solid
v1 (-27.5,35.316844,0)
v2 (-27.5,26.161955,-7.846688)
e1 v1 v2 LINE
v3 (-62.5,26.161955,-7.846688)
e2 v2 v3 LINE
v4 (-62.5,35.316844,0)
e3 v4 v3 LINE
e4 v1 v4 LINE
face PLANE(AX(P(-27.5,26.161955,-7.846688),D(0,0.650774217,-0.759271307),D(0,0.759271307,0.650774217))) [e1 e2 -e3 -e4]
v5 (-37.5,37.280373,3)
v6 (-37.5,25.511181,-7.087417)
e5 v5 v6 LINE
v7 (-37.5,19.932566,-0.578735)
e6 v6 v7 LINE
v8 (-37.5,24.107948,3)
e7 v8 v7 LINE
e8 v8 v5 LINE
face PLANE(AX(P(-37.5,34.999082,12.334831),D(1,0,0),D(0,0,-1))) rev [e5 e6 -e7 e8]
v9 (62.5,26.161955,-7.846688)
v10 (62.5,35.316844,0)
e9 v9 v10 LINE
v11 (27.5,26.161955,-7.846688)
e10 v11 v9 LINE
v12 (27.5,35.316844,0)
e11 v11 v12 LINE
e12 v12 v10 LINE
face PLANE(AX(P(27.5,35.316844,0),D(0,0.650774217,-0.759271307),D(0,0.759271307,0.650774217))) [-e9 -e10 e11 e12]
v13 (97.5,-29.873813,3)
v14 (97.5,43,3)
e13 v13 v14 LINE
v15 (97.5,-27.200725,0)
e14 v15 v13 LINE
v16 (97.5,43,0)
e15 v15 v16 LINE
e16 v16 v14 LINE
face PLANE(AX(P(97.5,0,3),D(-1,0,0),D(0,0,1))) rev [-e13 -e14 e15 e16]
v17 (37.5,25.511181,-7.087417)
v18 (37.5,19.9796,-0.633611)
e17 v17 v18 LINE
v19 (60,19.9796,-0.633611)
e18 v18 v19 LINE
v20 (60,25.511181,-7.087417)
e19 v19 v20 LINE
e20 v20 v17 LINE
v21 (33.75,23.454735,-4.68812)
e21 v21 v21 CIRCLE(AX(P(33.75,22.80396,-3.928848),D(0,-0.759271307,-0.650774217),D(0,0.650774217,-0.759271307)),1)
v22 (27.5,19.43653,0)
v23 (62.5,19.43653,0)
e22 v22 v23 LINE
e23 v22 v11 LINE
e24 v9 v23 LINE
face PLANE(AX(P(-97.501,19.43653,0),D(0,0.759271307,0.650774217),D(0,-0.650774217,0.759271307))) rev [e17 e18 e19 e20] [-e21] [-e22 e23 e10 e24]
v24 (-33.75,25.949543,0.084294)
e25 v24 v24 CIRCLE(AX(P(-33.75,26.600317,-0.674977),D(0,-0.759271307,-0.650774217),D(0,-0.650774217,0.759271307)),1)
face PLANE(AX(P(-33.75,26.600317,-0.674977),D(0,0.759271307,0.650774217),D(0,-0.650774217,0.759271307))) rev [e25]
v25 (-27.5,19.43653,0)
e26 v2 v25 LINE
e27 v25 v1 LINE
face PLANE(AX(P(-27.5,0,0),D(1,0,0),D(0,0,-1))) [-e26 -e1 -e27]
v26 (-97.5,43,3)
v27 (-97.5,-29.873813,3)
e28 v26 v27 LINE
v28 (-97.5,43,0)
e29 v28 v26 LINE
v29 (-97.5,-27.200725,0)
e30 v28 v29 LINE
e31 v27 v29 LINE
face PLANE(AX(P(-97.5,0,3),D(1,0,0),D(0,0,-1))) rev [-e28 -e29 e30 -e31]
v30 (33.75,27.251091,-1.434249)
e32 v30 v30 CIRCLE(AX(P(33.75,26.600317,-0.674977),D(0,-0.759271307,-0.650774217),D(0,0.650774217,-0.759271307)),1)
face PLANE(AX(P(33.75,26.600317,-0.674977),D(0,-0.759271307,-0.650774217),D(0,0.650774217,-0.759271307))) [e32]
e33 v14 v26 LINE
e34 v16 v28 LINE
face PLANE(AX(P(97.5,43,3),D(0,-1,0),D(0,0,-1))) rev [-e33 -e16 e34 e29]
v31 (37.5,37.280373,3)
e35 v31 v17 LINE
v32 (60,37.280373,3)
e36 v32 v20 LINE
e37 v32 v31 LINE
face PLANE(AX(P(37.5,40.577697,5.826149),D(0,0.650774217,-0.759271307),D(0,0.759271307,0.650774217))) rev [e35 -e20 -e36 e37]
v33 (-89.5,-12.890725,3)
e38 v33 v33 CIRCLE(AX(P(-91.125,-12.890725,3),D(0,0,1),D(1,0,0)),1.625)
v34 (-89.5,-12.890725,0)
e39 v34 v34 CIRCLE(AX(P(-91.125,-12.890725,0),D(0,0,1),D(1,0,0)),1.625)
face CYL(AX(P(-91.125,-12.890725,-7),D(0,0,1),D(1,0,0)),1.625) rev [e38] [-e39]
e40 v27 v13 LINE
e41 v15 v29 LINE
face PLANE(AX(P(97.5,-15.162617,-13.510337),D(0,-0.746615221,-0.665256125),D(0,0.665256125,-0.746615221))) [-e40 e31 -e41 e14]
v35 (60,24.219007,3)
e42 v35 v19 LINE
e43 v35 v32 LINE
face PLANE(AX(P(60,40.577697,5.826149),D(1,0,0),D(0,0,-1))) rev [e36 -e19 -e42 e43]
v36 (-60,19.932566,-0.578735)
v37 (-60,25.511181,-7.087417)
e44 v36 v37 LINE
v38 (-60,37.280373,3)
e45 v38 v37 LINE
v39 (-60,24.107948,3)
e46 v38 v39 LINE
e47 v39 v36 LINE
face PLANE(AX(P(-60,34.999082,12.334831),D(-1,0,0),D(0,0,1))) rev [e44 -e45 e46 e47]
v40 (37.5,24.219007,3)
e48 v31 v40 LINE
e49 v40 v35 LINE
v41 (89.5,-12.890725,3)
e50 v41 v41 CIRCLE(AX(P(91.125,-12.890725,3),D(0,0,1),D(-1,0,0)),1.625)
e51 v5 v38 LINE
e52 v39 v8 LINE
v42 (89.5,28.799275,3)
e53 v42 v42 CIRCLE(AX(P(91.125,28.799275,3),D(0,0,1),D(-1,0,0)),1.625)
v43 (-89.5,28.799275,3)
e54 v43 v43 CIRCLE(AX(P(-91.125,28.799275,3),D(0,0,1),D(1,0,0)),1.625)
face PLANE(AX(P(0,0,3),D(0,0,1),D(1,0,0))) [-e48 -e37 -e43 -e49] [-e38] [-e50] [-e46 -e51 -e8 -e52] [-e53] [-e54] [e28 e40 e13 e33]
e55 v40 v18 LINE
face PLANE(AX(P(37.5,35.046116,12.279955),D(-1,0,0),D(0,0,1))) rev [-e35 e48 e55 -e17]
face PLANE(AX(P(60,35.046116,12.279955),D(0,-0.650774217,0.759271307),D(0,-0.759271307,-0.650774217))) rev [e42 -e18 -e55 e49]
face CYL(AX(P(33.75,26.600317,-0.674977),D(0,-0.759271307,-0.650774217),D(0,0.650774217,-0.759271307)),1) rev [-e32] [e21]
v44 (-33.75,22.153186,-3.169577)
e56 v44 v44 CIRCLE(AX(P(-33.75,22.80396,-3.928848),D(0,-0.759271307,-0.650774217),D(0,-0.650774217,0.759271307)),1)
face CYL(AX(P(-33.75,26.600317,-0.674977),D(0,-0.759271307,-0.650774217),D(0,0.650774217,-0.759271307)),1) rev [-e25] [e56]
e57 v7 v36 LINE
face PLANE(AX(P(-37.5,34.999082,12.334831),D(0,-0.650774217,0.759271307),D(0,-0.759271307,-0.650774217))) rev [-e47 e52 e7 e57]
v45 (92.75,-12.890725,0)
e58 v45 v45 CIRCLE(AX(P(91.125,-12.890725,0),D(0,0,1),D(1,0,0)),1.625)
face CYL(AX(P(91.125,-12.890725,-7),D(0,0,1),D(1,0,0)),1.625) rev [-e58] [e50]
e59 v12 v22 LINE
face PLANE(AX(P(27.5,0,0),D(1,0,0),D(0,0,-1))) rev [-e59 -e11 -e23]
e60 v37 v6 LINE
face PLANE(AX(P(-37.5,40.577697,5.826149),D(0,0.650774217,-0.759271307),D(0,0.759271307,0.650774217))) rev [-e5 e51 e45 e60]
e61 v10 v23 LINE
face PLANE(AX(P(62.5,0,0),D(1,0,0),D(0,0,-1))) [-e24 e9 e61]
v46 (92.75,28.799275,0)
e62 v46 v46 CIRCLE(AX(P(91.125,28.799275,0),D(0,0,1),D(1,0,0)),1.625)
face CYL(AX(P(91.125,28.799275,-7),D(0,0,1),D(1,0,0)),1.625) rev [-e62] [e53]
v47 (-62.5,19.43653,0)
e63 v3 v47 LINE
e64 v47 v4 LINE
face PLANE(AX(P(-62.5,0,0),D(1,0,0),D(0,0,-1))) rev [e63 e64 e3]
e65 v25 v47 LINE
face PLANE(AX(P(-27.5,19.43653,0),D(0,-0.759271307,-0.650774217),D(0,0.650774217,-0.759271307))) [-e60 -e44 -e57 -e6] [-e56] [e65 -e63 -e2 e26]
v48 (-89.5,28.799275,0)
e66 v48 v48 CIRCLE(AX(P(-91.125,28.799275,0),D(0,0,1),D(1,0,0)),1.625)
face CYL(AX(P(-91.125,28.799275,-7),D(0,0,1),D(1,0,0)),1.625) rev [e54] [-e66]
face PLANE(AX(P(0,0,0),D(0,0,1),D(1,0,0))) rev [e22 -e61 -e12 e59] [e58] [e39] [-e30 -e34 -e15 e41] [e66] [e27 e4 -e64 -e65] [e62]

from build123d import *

# Parameters (mm, degrees)
CROQUIS1_W                  = 195
CROQUIS1_H                  = 38
CROQUIS1_R                  = 1.625
SALIENTE_EXTRUIR1_DEPTH     = 3
CROQUIS8_W                  = 195
CROQUIS8_H                  = 3
SALIENTE_EXTRUIR5_DEPTH     = 5
CROQUIS9_W                  = 195
CROQUIS9_H                  = 3
SALIENTE_EXTRUIR6_DEPTH     = 5
SALIENTE_EXTRUIR7_START     = -35
SALIENTE_EXTRUIR7_DEPTH     = 35
CORTAR_EXTRUIR4_DEPTH       = 106.249773968
CORTAR_EXTRUIR4_DEPTH_BACK  = 106.249773968
CROQUIS11_W                 = 22.5
CROQUIS11_H                 = 8.5
CORTAR_EXTRUIR5_REACH       = 168.049
CROQUIS13_R                 = 1
CORTAR_EXTRUIR6_DEPTH       = 5
SALIENTE_EXTRUIR8_START     = -35
SALIENTE_EXTRUIR8_DEPTH     = 35
CORTAR_EXTRUIR7_DEPTH       = 105.027363957
CORTAR_EXTRUIR7_DEPTH_BACK  = 105.027363957
CROQUIS16_W                 = 22.5
CROQUIS16_H                 = 8.572274099
CROQUIS17_R                 = 1
CORTAR_EXTRUIR8_DEPTH       = 5
CROQUIS18_R                 = 1.625
CORTAR_EXTRUIR9_DEPTH       = 10
CROQUIS19_W                 = 195
CROQUIS19_H                 = 24
SALIENTE_EXTRUIR9_DEPTH     = 3
CROQUIS20_W                 = 195
CROQUIS20_H                 = 28.69
SALIENTE_EXTRUIR10_DEPTH    = 3
CROQUIS22_W                 = 195
CROQUIS22_H                 = 8.799275258
CROQUIS22_W_2               = 10.817472397
CROQUIS22_H_2               = 9.408992843
CROQUIS22_W_3               = 11.057059306
SALIENTE_EXTRUIR11_DEPTH    = 3
CROQUIS23_R                 = 1.625
CORTAR_EXTRUIR10_DEPTH      = 10
CORTAR_EXTRUIR11_DEPTH      = 202.915168907
CORTAR_EXTRUIR11_DEPTH_BACK = 202.915168907
CROQUIS25_W                 = 6.04831912
CROQUIS25_H                 = 14.575165693
SALIENTE_EXTRUIR12_START    = -65
SALIENTE_EXTRUIR12_DEPTH    = 65
SALIENTE_EXTRUIR15_DEPTH    = 12.75
SALIENTE_EXTRUIR16_DEPTH    = 12.75
CROQUIS27_W                 = 3
CROQUIS27_H                 = 30
SALIENTE_EXTRUIR13_DEPTH    = 195
SALIENTE_EXTRUIR14_DEPTH    = 195
CORTAR_EXTRUIR12_DEPTH      = 127.00662353
CORTAR_EXTRUIR12_DEPTH_BACK = 127.00662353
CROQUIS31_R                 = 1.625
SALIENTE_EXTRUIR17_DEPTH    = 12.75
SALIENTE_EXTRUIR18_DEPTH    = 12.75
CORTAR_EXTRUIR15_DEPTH      = 125.603100021
CORTAR_EXTRUIR15_DEPTH_BACK = 125.603100021
CROQUIS39_R                 = 1.625
CORTAR_EXTRUIR16_START      = -4
CROQUIS40_R                 = 4
CORTAR_EXTRUIR16_DEPTH      = 121.603100021
SALIENTE_EXTRUIR19_START    = -15
SALIENTE_EXTRUIR19_DEPTH    = 4
CHAFL_N1_SIZE               = 10
CORTAR_EXTRUIR17_DEPTH      = 213.001339527
CORTAR_EXTRUIR17_DEPTH_BACK = 213.001339527
CROQUIS45_W                 = 3
CROQUIS45_H                 = 8.799275258
CORTAR_EXTRUIR18_DEPTH      = 202.915168907


with BuildPart() as part:
    # Croquis1 → Saliente-Extruir1 (new body)
    with BuildSketch(Plane.XY):
        with Locations((0, 19)):
            Rectangle(CROQUIS1_W, CROQUIS1_H)
        with Locations((91.125, 15)):
            Circle(CROQUIS1_R, mode=Mode.SUBTRACT)
        with Locations(Location((-91.125, 15, 0), (0, 0, 180))):
            Circle(CROQUIS1_R, mode=Mode.SUBTRACT)
    extrude(amount=SALIENTE_EXTRUIR1_DEPTH)

    # Croquis8 → Saliente-Extruir5 (add)
    with BuildSketch(Plane.XZ):
        with Locations((0, 1.5)):
            Rectangle(CROQUIS8_W, CROQUIS8_H)
    extrude(amount=SALIENTE_EXTRUIR5_DEPTH)

    # Croquis9 → Saliente-Extruir6 (add)
    with BuildSketch(Plane(origin=(0, 38, 0), x_dir=(1, 0, 0), z_dir=(0, 1, 0))):
        with Locations((0, -1.5)):
            Rectangle(CROQUIS9_W, CROQUIS9_H)
    extrude(amount=SALIENTE_EXTRUIR6_DEPTH)

    # Croquis10 → Saliente-Extruir7 (add)
    with BuildSketch(Plane(origin=(97.5, 0, 0), x_dir=(0, 0, -1), z_dir=(1, 0, 0)).offset(SALIENTE_EXTRUIR7_START)):
        Polygon((0, 35.316843742), (11.100559408, 22.365598856), (1.230032412, 13.905534031), (0, 12.851268747), align=None)
    extrude(amount=-SALIENTE_EXTRUIR7_DEPTH)

    # Croquis11 → Cortar-Extruir4 (cut, two sides: drawn at the far end of the back side and taken through both)
    with BuildSketch(Plane(origin=(0, 7.408665422, 6.349994257), x_dir=(1, 0, 0), z_dir=(0, -0.7592713073348797, -0.6507742172658522)).offset(-CORTAR_EXTRUIR4_DEPTH_BACK)):
        with Locations((48.75, -17.733291342)):
            Rectangle(CROQUIS11_W, CROQUIS11_H)
    extrude(amount=CORTAR_EXTRUIR4_DEPTH + CORTAR_EXTRUIR4_DEPTH_BACK, mode=Mode.SUBTRACT)

    # Croquis12 → Cortar-Extruir5 (cut, up to next)
    with BuildSketch(Plane(origin=(62.5, 0, 0), x_dir=(0, 0, -1), z_dir=(1, 0, 0)), mode=Mode.PRIVATE) as cortar_extruir5_sk1:
        Polygon((11.100559408, 22.365598856), (0, 12.851268747), (0, 19.436530105), (7.846688321, 26.161955392), align=None)
    cortar_extruir5_tool1 = extrude(cortar_extruir5_sk1.sketch, amount=-CORTAR_EXTRUIR5_REACH, mode=Mode.PRIVATE) & part.part
    add(cortar_extruir5_tool1.solids().sort_by_distance((62.5, 20.055266, -4.783378))[0], mode=Mode.SUBTRACT)

    # Croquis13 → Cortar-Extruir6 (cut)
    with BuildSketch(Plane(origin=(0, 11.205021959, 9.603865343), x_dir=(1, 0, 0), z_dir=(0, -0.7592713073348788, -0.6507742172658535))):
        with Locations(Location((33.75, -17.823291342, 0), (0, 0, 270))):
            Circle(CROQUIS13_R)
    extrude(amount=-CORTAR_EXTRUIR6_DEPTH, mode=Mode.SUBTRACT)

    # Croquis14 → Saliente-Extruir8 (add)
    with BuildSketch(Plane.ZY.offset(97.5).offset(SALIENTE_EXTRUIR8_START)):
        Polygon((0, 19.436530105), (-7.846688321, 26.161955392), (0, 35.316843742), align=None)
    extrude(amount=-SALIENTE_EXTRUIR8_DEPTH)

    # Croquis16 → Cortar-Extruir7 (cut, two sides: drawn at the far end of the back side and taken through both)
    with BuildSketch(Plane(origin=(0, 11.205021959, 9.603865343), x_dir=(1, 0, 0), z_dir=(0, -0.7592713073348788, -0.6507742172658535)).offset(-CORTAR_EXTRUIR7_DEPTH_BACK)):
        with Locations((-48.75, -17.697154293)):
            Rectangle(CROQUIS16_W, CROQUIS16_H)
    extrude(amount=CORTAR_EXTRUIR7_DEPTH + CORTAR_EXTRUIR7_DEPTH_BACK, mode=Mode.SUBTRACT)

    # Croquis17 → Cortar-Extruir8 (cut)
    with BuildSketch(Plane(origin=(0, 11.205021959, 9.603865343), x_dir=(1, 0, 0), z_dir=(0, -0.7592713073348788, -0.6507742172658535))):
        with Locations(Location((-33.75, -17.823291342, 0), (0, 0, 90))):
            Circle(CROQUIS17_R)
    extrude(amount=-CORTAR_EXTRUIR8_DEPTH, mode=Mode.SUBTRACT)

    # Croquis18 → Cortar-Extruir9 (cut)
    with BuildSketch(Plane.XY.offset(3)):
        with Locations((91.125, 23)):
            Circle(CROQUIS18_R)
        with Locations((-91.125, 23)):
            Circle(CROQUIS18_R)
    extrude(amount=-CORTAR_EXTRUIR9_DEPTH, mode=Mode.SUBTRACT)

    # Croquis19 → Saliente-Extruir9 (add)
    with BuildSketch(Plane.XY.offset(3)):
        with Locations((0, 7)):
            Rectangle(CROQUIS19_W, CROQUIS19_H)
    extrude(amount=-SALIENTE_EXTRUIR9_DEPTH)

    # Croquis20 → Saliente-Extruir10 (add)
    with BuildSketch(Plane.XY.offset(3)):
        with Locations((0, -19.345)):
            Rectangle(CROQUIS20_W, CROQUIS20_H)
    extrude(amount=-SALIENTE_EXTRUIR10_DEPTH)

    # Croquis22 → Saliente-Extruir11 (add)
    with BuildSketch(Plane.XY.offset(3)):
        with Locations((0, 47.399637629)):
            Rectangle(CROQUIS22_W, CROQUIS22_H)
        with Locations((-92.091263802, 22.840486177)):
            Rectangle(CROQUIS22_W_2, CROQUIS22_H_2)
        with Locations((91.971470347, 22.840486177)):
            Rectangle(CROQUIS22_W_3, CROQUIS22_H_2)
    extrude(amount=-SALIENTE_EXTRUIR11_DEPTH)

    # Croquis23 → Cortar-Extruir10 (cut)
    with BuildSketch(Plane.XY.offset(3)):
        with Locations((-91.125, 28.799275258)):
            Circle(CROQUIS23_R)
        with Locations((-91.125, -12.890724742)):
            Circle(CROQUIS23_R)
        with Locations((91.125, -12.890724742)):
            Circle(CROQUIS23_R)
        with Locations((91.125, 28.799275258)):
            Circle(CROQUIS23_R)
    extrude(amount=-CORTAR_EXTRUIR10_DEPTH, mode=Mode.SUBTRACT)

    # Croquis25 → Cortar-Extruir11 (cut, two sides: drawn at the far end of the back side and taken through both)
    with BuildSketch(Plane.ZY.offset(97.5).offset(-CORTAR_EXTRUIR11_DEPTH_BACK)):
        with Locations((3.02415956, -34.488307588)):
            Rectangle(CROQUIS25_W, CROQUIS25_H)
    extrude(amount=CORTAR_EXTRUIR11_DEPTH + CORTAR_EXTRUIR11_DEPTH_BACK, mode=Mode.SUBTRACT)

    # Croquis26 → Saliente-Extruir12 (add)
    with BuildSketch(Plane(origin=(97.5, 0, 0), x_dir=(0, 0, -1), z_dir=(1, 0, 0)).offset(SALIENTE_EXTRUIR12_START)):
        Polygon((0, 51.799275258), (0, 57.17304517), (3, 57.17304517), (3, 48.799275258), (0, 44.799275258), align=None)
    extrude(amount=-SALIENTE_EXTRUIR12_DEPTH)

    # Croquis29 → Saliente-Extruir15 (add)
    with BuildSketch(Plane(origin=(97.5, 0, 0), x_dir=(0, 0, -1), z_dir=(1, 0, 0))):
        Polygon((-3, -27.200724742), (21.04761885, -55.257563071), (22.868084319, -53.697235453), (-1.179534531, -25.640397124), align=None)
    extrude(amount=-SALIENTE_EXTRUIR15_DEPTH)

    # Croquis30 → Saliente-Extruir16 (add)
    with BuildSketch(Plane.ZY.offset(97.5)):
        Polygon((0, -27.200724742), (3, -27.200724742), (-21.04761885, -55.257563071), (-22.868084319, -53.697235453), align=None)
    extrude(amount=-SALIENTE_EXTRUIR16_DEPTH)

    # Croquis27 → Saliente-Extruir13 (add)
    with BuildSketch(Plane(origin=(97.5, 0, 0), x_dir=(0, 0, -1), z_dir=(1, 0, 0))):
        with Locations((-1.5, -42.200724742)):
            Rectangle(CROQUIS27_W, CROQUIS27_H)
    extrude(amount=-SALIENTE_EXTRUIR13_DEPTH)

    # Croquis28 → Saliente-Extruir14 (add)
    with BuildSketch(Plane(origin=(97.5, 0, 0), x_dir=(0, 0, -1), z_dir=(1, 0, 0))):
        Polygon((20.723276226, -76.378985981), (0, -52.200724742), (0, -57.200724742), (-3, -57.200724742), (16.523226518, -79.978863962), align=None)
        Polygon((0, -57.200724742), (0, -52.200724742), (-3, -54.772035726), (-3, -57.200724742), align=None)
    extrude(amount=-SALIENTE_EXTRUIR14_DEPTH)

    # Croquis31 → Cortar-Extruir12 (cut, two sides: drawn at the far end of the back side and taken through both)
    with BuildSketch(Plane(origin=(0, -13.002042132, 15.169742848), x_dir=(1, 0, 0), z_dir=(0, -0.6507742172658533, 0.7592713073348789)).offset(-CORTAR_EXTRUIR12_DEPTH_BACK)):
        with Locations(Location((91.125, -37.962916807, 0), (0, 0, 270))):
            Circle(CROQUIS31_R)
        with Locations(Location((-91.125, -37.962916807, 0), (0, 0, 270))):
            Circle(CROQUIS31_R)
    extrude(amount=CORTAR_EXTRUIR12_DEPTH + CORTAR_EXTRUIR12_DEPTH_BACK, mode=Mode.SUBTRACT)

    # Croquis32 → Saliente-Extruir17 (add)
    with BuildSketch(Plane(origin=(97.5, 0, 0), x_dir=(0, 0, -1), z_dir=(1, 0, 0))):
        Polygon((0, -30.7008848), (21.04761885, -55.257563071), (10.361638113, -64.289855362), (0, -52.200724742), align=None)
    extrude(amount=-SALIENTE_EXTRUIR17_DEPTH)

    # Croquis33 → Saliente-Extruir18 (add)
    with BuildSketch(Plane.ZY.offset(97.5)):
        Polygon((0, -30.7008848), (0, -52.200724742), (-10.361638113, -64.289855362), (-21.04761885, -55.257563071), align=None)
    extrude(amount=-SALIENTE_EXTRUIR18_DEPTH)

    # Croquis39 → Cortar-Extruir15 (cut, two sides: drawn at the far end of the back side and taken through both)
    with BuildSketch(Plane(origin=(0, -11.441714514, 13.349277379), x_dir=(-1, 0, 0), z_dir=(0, 0.6507742172658534, -0.7592713073348788)).offset(-CORTAR_EXTRUIR15_DEPTH_BACK)):
        with Locations(Location((91.125, -37.962916807, 0), (0, 0, 270))):
            Circle(CROQUIS39_R)
        with Locations(Location((-91.125, -37.962916807, 0), (0, 0, 270))):
            Circle(CROQUIS39_R)
    extrude(amount=CORTAR_EXTRUIR15_DEPTH + CORTAR_EXTRUIR15_DEPTH_BACK, mode=Mode.SUBTRACT)

    # Croquis40 → Cortar-Extruir16 (cut, through all)
    with BuildSketch(Plane(origin=(0, -11.441714514, 13.349277379), x_dir=(-1, 0, 0), z_dir=(0, 0.6507742172658534, -0.7592713073348788)).offset(CORTAR_EXTRUIR16_START)):
        with Locations(Location((-91.125, -37.962916807, 0), (0, 0, 90))):
            Circle(CROQUIS40_R)
        with Locations(Location((91.125, -37.962916807, 0), (0, 0, 90))):
            Circle(CROQUIS40_R)
    extrude(amount=-CORTAR_EXTRUIR16_DEPTH, mode=Mode.SUBTRACT)

    # Croquis43 → Saliente-Extruir19 (add)
    with BuildSketch(Plane(origin=(0, -54.271609374, -46.516395087), x_dir=(1, 0, 0), z_dir=(0, -0.7592713073348788, -0.6507742172658533)).offset(SALIENTE_EXTRUIR19_START)):
        with BuildLine():
            Line((-10, 33.970885785), (10, 33.970885785))
            Line((10, 33.970885785), (10, 23.970885785))
            Line((10, 23.970885785), (3.75, 23.970885785))
            Line((3.75, 23.970885785), (3.75, 28.970885785))
            ThreePointArc((3.75, 28.970885785), (0, 32.720885785), (-3.75, 28.970885785))
            Line((-3.75, 28.970885785), (-3.75, 23.970885785))
            Line((-3.75, 23.970885785), (-10, 23.970885785))
            Line((-10, 23.970885785), (-10, 33.970885785))
        make_face()
    extrude(amount=-SALIENTE_EXTRUIR19_DEPTH)

    # Chaflán1
    chafl_n1_edges = [part.edges().sort_by_distance(p)[0] for p in [
        (-10, -63.471373756, -9.660114532),
        (10, -63.471373756, -9.660114532),
    ]]
    chamfer(chafl_n1_edges, length=CHAFL_N1_SIZE - 0.0001)  # a hair under: the kernel refuses the full size

    # Croquis44 → Cortar-Extruir17 (cut, two sides: drawn at the far end of the back side and taken through both)
    with BuildSketch(Plane.ZY.offset(97.5).offset(-CORTAR_EXTRUIR17_DEPTH_BACK)):
        Polygon((0, 51.799275258), (0, 44.799275258), (-5.496499464, 48.299275258), (-4.805550045, 58.708716301), (3.346767107, 60.185775605), align=None)
        Polygon((0, -27.200724742), (19.940439733, -44.968243133), (-20.573128604, -90.43651563), (-48.007758083, -62.518842932), (0, -27.016583675), align=None)
    extrude(amount=CORTAR_EXTRUIR17_DEPTH + CORTAR_EXTRUIR17_DEPTH_BACK, mode=Mode.SUBTRACT)

    # Croquis45 → Cortar-Extruir18 (cut, through all)
    with BuildSketch(Plane.ZY.offset(97.5)):
        with Locations((1.5, 47.399637629)):
            Rectangle(CROQUIS45_W, CROQUIS45_H)
    extrude(amount=-CORTAR_EXTRUIR18_DEPTH, mode=Mode.SUBTRACT)


solid = part.part
